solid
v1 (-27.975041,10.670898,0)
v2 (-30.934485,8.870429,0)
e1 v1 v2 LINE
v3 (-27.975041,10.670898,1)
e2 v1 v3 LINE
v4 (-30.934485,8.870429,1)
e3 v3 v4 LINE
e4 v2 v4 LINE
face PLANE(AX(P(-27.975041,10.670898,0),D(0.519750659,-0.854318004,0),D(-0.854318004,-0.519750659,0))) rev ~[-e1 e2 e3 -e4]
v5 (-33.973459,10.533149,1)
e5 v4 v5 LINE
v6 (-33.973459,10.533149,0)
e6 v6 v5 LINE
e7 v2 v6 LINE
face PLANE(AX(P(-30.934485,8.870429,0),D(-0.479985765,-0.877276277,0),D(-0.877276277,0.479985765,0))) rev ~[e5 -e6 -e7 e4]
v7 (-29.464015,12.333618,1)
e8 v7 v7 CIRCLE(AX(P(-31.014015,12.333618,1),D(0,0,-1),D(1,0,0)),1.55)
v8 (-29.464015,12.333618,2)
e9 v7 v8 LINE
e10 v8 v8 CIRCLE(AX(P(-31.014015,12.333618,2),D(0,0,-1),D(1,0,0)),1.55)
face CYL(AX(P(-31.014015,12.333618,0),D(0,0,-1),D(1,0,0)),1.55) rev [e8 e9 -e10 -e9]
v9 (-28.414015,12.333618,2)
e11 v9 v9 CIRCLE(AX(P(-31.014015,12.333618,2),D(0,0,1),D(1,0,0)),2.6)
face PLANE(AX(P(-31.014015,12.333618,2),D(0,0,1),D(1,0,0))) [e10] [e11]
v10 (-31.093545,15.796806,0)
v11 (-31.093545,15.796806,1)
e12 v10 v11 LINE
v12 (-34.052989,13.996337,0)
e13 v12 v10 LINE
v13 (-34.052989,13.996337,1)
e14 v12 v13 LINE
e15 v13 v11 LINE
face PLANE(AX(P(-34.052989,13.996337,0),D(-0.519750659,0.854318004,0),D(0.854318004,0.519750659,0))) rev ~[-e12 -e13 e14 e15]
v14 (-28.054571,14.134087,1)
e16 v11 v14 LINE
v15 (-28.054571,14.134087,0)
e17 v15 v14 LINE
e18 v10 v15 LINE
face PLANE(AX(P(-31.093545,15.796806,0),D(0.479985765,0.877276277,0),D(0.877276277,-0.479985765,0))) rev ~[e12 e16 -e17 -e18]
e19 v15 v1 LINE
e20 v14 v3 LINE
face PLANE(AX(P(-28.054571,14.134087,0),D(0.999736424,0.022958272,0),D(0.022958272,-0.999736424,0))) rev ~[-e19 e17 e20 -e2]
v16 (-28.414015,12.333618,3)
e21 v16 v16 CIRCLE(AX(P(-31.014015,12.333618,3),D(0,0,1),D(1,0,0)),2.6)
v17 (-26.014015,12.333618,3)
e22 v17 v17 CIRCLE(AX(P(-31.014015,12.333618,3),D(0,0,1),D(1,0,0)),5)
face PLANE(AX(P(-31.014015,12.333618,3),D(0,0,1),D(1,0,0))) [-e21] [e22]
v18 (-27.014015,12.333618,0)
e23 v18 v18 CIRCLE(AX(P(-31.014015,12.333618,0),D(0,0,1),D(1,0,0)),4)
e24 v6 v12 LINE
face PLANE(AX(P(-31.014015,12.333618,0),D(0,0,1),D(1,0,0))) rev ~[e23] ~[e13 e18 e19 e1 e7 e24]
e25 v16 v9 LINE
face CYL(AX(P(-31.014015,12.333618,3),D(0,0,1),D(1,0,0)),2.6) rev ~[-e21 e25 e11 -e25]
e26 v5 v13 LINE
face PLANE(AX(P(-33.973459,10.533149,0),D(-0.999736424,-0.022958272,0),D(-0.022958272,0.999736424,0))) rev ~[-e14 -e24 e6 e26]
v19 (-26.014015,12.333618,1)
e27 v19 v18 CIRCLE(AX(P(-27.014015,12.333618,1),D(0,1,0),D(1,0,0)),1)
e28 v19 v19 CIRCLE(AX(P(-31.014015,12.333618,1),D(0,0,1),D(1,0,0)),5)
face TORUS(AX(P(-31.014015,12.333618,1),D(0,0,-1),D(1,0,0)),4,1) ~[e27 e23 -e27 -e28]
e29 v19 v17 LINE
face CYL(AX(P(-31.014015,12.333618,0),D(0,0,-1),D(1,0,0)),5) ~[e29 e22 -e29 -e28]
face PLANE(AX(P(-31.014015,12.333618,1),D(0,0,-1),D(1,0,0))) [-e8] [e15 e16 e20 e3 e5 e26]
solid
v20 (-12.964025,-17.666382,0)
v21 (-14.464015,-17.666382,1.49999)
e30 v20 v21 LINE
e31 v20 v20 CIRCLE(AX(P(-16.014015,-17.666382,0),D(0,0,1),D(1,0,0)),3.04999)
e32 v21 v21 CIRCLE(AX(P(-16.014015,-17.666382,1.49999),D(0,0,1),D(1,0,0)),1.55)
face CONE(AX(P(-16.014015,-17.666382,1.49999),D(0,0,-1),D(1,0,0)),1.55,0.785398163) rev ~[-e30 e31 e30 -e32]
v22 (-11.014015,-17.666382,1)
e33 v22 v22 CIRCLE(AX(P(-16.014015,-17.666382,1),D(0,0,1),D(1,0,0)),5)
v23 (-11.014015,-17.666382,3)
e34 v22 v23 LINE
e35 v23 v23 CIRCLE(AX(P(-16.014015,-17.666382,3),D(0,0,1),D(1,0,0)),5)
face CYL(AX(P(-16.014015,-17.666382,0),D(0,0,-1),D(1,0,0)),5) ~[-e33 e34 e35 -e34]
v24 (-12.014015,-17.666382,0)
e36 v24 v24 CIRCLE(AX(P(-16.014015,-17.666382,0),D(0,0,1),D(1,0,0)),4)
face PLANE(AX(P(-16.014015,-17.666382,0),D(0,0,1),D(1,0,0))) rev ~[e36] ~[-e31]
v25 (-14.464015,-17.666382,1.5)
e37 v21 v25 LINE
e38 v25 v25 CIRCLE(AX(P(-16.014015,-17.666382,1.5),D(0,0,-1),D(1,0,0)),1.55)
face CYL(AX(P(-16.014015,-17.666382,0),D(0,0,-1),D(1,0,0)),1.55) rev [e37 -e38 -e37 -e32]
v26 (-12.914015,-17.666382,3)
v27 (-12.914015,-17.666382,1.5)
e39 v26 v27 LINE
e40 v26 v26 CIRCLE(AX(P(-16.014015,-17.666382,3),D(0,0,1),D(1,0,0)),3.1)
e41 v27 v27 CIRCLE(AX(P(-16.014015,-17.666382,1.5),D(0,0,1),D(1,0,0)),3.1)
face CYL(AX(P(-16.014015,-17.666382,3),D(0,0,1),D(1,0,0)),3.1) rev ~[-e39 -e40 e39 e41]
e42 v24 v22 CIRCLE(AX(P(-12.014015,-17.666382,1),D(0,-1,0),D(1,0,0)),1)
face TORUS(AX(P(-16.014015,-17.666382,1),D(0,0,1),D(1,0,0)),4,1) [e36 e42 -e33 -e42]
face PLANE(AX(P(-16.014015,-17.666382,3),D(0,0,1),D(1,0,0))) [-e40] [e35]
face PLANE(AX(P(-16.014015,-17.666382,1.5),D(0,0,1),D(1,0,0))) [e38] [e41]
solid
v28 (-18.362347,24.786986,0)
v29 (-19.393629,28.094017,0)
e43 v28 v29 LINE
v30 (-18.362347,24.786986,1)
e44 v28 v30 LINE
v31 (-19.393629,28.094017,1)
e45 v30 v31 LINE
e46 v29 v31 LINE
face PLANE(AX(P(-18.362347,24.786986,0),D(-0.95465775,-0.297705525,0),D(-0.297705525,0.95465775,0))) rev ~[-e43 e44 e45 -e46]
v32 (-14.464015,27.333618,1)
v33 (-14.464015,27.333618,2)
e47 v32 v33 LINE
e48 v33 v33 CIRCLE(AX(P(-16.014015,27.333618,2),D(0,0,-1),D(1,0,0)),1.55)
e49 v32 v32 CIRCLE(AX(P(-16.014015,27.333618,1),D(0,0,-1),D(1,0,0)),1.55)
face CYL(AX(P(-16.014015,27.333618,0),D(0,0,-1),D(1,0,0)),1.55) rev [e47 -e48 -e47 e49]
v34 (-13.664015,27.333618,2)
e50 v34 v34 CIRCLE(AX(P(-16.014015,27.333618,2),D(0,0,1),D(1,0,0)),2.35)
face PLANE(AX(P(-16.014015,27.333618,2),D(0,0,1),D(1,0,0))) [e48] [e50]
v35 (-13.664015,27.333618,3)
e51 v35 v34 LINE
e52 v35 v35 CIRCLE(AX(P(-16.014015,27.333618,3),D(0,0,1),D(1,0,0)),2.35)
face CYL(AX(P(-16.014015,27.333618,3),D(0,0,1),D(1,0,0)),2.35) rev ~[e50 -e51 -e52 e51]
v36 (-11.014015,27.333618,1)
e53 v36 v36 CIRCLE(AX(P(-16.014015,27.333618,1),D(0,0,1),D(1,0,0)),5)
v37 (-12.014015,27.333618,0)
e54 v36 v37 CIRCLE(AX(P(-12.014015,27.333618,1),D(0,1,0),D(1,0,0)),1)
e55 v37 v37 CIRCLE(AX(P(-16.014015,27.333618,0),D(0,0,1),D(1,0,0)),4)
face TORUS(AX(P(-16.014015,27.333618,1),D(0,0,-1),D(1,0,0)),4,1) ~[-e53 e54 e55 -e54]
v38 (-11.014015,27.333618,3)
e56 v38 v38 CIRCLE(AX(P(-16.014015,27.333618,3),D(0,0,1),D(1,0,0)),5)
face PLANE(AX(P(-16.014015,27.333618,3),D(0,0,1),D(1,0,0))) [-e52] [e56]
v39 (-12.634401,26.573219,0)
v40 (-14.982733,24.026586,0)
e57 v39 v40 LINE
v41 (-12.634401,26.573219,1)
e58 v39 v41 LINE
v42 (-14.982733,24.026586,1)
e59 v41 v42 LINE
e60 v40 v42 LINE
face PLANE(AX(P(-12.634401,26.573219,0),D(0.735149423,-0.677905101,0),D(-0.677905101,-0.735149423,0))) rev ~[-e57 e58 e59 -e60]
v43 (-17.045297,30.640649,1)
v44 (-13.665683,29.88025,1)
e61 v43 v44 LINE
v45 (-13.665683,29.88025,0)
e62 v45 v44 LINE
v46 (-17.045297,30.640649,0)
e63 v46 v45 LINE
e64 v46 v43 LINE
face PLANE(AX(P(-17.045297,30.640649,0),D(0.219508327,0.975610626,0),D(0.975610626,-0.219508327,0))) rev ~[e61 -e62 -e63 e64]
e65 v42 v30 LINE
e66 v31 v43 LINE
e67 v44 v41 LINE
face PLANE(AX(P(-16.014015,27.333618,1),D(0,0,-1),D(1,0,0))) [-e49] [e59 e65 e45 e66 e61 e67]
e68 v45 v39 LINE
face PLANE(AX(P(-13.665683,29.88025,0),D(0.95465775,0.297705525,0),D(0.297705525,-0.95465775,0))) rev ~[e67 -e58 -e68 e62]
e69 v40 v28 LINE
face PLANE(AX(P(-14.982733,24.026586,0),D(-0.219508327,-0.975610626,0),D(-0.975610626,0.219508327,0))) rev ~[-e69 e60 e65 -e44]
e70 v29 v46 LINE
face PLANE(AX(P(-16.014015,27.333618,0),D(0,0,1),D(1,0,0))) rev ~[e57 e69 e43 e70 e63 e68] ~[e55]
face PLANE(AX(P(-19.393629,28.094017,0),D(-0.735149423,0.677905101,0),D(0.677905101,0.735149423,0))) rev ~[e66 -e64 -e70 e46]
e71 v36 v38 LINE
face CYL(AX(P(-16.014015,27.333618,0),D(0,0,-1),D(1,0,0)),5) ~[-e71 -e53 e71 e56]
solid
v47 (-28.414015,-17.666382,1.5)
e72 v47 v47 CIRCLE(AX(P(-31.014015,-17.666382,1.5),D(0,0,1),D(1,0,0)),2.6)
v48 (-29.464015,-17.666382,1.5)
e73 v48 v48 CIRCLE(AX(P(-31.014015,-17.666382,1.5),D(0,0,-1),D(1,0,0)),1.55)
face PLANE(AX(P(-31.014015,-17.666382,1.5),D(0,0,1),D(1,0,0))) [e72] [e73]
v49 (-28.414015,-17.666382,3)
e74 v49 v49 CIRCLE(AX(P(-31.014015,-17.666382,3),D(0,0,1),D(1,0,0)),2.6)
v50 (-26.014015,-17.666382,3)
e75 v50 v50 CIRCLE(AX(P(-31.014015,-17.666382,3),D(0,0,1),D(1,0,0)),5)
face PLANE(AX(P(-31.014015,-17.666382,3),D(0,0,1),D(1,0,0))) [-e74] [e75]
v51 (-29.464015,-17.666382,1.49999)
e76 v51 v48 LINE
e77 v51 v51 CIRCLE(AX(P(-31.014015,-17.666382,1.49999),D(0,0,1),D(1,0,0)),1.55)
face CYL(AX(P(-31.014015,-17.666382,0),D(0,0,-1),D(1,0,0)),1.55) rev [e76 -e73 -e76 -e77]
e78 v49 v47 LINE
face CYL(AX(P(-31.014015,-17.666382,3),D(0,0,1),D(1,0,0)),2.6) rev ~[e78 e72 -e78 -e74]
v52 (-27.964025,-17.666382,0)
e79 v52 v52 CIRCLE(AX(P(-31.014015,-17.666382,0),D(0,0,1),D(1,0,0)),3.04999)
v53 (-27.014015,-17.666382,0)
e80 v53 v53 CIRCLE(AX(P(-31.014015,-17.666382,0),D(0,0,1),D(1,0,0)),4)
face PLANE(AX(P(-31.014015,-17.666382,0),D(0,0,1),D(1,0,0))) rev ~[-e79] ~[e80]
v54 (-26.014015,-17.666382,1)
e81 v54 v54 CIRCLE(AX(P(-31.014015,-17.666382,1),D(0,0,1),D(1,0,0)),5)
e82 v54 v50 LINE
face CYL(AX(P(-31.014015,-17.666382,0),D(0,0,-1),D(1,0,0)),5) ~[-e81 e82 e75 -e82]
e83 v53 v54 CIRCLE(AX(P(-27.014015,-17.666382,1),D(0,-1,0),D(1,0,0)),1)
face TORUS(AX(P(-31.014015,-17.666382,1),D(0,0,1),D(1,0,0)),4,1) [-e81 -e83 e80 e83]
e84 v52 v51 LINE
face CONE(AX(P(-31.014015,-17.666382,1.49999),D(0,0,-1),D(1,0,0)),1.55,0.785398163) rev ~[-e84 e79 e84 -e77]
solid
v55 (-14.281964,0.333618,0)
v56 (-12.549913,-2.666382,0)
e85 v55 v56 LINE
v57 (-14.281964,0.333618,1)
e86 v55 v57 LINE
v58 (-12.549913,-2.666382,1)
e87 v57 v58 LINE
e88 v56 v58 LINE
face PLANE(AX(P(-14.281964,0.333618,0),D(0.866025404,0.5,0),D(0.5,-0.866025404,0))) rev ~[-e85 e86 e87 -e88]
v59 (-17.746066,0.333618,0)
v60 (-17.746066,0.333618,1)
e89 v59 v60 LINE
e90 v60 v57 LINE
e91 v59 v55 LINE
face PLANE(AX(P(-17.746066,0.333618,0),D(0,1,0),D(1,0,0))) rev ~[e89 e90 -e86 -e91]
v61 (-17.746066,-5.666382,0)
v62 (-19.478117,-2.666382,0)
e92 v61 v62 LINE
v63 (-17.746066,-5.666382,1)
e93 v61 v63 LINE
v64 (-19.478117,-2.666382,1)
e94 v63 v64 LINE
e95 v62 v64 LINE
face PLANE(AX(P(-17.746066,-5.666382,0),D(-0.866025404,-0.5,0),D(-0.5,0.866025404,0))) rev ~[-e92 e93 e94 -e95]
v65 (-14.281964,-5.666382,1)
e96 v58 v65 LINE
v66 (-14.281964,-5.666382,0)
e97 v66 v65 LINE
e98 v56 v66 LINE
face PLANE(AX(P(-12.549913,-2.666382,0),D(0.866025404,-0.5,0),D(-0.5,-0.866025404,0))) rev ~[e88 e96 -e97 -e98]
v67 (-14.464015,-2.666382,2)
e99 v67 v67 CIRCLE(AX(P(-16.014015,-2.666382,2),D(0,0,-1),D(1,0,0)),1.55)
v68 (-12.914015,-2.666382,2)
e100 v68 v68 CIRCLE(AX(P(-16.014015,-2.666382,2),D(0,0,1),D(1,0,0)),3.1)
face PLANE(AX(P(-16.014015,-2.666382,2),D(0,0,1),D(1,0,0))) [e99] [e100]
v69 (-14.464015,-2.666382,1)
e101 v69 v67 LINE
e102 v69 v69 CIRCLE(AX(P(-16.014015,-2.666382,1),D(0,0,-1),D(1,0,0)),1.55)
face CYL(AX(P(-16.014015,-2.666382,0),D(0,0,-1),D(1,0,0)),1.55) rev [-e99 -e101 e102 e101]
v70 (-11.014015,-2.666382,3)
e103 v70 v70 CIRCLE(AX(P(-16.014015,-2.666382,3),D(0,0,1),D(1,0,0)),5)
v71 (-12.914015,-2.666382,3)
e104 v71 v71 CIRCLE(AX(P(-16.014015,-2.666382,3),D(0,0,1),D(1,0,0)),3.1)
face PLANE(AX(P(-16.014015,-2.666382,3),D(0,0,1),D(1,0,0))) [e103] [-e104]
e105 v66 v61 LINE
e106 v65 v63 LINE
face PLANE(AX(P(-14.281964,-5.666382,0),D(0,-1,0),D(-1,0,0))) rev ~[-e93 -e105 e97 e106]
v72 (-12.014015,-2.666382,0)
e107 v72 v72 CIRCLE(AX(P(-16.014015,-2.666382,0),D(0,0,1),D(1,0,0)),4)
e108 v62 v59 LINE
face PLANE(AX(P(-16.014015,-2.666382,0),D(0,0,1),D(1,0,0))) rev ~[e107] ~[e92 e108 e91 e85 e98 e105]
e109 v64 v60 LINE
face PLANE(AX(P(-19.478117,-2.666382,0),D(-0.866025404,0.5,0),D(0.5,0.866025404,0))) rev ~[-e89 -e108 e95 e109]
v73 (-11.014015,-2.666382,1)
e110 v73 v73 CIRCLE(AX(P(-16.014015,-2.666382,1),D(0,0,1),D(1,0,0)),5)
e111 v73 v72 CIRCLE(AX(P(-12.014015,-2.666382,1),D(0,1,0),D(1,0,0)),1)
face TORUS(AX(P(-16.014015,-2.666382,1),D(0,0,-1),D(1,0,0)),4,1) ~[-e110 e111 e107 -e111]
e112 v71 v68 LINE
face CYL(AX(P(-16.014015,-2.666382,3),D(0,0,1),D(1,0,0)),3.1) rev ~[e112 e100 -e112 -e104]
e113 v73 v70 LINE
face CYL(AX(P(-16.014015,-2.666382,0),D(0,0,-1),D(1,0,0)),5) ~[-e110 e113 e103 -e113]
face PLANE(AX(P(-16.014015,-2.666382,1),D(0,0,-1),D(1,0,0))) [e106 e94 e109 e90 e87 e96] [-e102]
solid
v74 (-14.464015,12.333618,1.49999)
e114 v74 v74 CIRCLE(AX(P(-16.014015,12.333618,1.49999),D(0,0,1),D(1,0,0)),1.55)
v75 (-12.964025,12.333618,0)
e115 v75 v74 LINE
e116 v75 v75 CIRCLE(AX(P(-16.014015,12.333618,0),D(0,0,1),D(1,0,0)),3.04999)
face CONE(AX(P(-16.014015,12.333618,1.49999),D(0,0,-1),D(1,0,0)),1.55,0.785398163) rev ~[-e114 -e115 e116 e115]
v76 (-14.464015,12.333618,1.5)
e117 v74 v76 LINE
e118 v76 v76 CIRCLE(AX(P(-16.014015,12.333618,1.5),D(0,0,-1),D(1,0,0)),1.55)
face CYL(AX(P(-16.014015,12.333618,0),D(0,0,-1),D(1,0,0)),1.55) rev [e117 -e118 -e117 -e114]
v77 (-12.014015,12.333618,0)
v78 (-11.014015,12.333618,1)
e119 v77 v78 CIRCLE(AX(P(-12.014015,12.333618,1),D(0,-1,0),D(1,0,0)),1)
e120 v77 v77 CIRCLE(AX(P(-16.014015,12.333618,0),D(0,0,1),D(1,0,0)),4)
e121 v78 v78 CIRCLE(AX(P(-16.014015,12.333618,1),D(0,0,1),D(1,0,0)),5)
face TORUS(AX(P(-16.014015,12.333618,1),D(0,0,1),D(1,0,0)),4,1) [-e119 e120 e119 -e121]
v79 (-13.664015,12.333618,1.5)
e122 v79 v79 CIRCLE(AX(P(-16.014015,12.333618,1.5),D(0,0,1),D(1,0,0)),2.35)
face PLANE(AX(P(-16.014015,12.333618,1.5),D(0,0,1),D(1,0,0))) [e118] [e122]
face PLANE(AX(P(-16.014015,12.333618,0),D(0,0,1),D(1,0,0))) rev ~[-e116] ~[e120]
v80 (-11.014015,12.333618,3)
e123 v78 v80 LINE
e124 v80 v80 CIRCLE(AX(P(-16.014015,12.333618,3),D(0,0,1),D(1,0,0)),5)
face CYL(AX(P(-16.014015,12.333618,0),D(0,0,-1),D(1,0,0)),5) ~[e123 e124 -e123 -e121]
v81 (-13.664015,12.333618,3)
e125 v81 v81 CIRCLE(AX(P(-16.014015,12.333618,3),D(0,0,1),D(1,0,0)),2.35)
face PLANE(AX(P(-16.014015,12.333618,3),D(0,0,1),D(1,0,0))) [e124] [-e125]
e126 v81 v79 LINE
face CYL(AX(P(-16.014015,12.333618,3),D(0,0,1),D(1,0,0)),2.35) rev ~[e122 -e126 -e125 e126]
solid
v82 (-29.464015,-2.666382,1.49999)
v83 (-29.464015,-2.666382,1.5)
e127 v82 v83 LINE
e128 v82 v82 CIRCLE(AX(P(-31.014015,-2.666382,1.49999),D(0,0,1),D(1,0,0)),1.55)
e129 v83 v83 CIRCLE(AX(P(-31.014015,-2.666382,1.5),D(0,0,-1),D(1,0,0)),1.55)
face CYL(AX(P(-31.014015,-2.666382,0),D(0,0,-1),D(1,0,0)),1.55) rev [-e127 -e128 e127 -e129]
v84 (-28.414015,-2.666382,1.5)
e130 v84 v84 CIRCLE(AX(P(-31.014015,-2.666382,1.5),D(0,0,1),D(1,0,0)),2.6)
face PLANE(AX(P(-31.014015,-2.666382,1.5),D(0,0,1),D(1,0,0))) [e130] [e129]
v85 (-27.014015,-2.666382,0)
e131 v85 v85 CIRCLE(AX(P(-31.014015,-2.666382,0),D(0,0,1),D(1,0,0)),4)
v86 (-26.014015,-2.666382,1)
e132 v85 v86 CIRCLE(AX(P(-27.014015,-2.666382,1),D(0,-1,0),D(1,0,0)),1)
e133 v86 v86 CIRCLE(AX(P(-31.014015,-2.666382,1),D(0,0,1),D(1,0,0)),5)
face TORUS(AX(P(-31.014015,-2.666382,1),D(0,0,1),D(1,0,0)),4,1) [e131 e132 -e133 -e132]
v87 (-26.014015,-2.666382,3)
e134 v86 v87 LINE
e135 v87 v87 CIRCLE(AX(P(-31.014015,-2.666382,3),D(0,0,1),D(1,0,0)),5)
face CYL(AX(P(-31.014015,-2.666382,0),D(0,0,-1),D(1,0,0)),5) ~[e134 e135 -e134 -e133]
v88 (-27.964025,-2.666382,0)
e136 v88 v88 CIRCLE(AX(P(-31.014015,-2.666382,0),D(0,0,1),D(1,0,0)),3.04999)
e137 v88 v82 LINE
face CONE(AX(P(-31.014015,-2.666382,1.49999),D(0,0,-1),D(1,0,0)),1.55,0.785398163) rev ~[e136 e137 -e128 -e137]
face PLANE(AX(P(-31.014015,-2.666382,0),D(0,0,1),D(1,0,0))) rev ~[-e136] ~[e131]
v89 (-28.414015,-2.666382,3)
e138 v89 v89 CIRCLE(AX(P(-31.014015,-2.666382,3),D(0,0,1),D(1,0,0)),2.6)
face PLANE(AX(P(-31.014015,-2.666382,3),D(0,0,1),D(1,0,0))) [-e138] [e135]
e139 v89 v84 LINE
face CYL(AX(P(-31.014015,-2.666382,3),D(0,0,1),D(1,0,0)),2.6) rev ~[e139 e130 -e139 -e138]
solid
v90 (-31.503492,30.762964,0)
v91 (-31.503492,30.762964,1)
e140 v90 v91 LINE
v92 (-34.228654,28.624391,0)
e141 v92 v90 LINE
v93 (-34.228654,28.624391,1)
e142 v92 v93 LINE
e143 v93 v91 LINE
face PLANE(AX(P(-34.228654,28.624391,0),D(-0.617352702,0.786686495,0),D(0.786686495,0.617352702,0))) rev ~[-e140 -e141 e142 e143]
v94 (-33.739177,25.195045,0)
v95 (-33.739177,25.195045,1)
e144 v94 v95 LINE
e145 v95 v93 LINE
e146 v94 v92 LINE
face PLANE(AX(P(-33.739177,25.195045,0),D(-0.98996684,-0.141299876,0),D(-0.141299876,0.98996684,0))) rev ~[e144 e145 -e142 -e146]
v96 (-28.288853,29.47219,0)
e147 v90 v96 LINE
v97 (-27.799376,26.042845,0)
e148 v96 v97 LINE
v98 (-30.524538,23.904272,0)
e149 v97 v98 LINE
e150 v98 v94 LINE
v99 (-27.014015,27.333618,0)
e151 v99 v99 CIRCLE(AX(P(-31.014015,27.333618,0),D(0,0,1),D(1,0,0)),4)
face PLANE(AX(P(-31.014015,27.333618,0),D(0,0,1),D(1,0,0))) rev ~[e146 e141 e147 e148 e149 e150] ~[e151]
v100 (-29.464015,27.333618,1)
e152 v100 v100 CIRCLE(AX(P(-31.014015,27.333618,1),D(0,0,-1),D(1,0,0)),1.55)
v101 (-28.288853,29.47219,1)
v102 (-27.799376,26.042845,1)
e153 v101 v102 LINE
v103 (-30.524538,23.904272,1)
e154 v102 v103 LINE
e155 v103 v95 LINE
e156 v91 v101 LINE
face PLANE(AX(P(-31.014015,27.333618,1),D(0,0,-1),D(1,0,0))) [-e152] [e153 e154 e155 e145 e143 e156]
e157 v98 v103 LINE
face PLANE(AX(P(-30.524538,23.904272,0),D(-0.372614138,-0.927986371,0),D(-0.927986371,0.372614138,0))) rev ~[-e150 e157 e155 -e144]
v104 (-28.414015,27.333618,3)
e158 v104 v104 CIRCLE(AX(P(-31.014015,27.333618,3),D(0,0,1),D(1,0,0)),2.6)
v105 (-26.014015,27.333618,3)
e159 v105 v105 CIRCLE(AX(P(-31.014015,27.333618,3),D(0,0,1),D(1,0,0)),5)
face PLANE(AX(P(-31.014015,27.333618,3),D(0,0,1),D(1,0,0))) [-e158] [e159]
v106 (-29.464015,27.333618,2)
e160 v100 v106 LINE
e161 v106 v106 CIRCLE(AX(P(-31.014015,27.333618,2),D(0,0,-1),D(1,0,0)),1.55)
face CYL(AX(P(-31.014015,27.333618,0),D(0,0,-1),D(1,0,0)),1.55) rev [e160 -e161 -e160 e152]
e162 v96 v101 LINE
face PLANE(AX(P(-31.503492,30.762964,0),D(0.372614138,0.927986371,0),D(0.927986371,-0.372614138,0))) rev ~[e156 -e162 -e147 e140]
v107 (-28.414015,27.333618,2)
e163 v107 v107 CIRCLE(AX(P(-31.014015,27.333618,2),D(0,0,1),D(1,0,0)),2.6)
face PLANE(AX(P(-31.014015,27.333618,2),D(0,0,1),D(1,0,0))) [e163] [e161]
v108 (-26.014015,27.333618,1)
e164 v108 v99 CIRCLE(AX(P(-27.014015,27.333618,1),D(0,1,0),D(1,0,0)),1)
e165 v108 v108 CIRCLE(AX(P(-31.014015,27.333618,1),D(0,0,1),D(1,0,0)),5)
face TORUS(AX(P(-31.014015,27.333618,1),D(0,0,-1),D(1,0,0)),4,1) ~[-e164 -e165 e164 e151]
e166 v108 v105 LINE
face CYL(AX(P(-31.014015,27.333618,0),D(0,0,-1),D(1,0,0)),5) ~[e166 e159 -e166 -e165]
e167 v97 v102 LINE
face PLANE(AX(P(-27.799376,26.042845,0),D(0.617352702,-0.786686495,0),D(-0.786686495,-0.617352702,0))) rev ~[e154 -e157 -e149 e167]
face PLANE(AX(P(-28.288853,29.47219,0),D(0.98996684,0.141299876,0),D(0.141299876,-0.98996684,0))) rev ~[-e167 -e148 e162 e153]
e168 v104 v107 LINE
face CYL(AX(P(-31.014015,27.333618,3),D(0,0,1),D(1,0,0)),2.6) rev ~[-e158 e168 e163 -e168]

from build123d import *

# Parameters (mm, degrees)
F0_R       = 5
F0_R_2     = 1.55
F1_DEPTH   = 3
F2_R       = 2.6
F3_DEPTH   = 1.5
F4_R       = 2.6
F5_DEPTH   = 1.5
F6_R       = 2.6
F7_DEPTH   = 1
F8_R       = 2.6
F9_DEPTH   = 1
F10_R      = 3.1
F11_DEPTH  = 1.5
F12_R      = 3.1
F13_DEPTH  = 1
F14_R      = 2.35
F15_DEPTH  = 1.5
F16_R      = 2.35
F17_DEPTH  = 1
F19_DEPTH  = 1
F21_DEPTH  = 1
F23_DEPTH  = 1
F25_DEPTH  = 1
F26_SIZE   = 1.49999
F26_2_SIZE = 1.49999
F26_3_SIZE = 1.49999
F26_4_SIZE = 1.49999
F27_R      = 1
F27_2_R    = 1
F27_3_R    = 1
F27_4_R    = 1
F27_5_R    = 1
F27_6_R    = 1
F27_7_R    = 1
F27_8_R    = 1


# Not quite as in the source:
# - a fillet or chamfer is up to 0.001 mm smaller than in the source, because OpenCascade refuses the exact size


with BuildPart() as f1:
    # F0 (on Top) → F1 (new body)
    with BuildSketch(Plane.XY):
        with Locations((-31.0140149226, -17.6663821694)):
            Circle(F0_R)
        with Locations((-31.0140149226, -17.6663821694)):
            Circle(F0_R_2, mode=Mode.SUBTRACT)
    extrude(amount=F1_DEPTH)

    # F2 (on face) → F3 (cut)
    with BuildSketch(Plane.XY.offset(3)):
        with Locations((-31.0140149226, -17.6663821694)):
            Circle(F2_R)
    extrude(amount=-F3_DEPTH, mode=Mode.SUBTRACT)

    # F26#4 (size 1.5 in the source; OpenCascade refuses exactly that, so slightly less here)
    f26_4_edges = [f1.edges().sort_by_distance(p)[0] for p in [
        (-32.564015, -17.666382, 0),
    ]]
    chamfer(f26_4_edges, length=F26_4_SIZE)

    # F27
    f27_edges = [f1.edges().sort_by_distance(p)[0] for p in [
        (-36.014015, -17.666382, 0),
    ]]
    fillet(f27_edges, radius=F27_R)


with BuildPart() as f1b:
    # F0 (on Top) → F1, piece 2 (new body)
    with BuildSketch(Plane.XY):
        with Locations((-31.0140149226, -2.6663821694)):
            Circle(F0_R)
        with Locations((-31.0140149226, -2.6663821694)):
            Circle(F0_R_2, mode=Mode.SUBTRACT)
    extrude(amount=F1_DEPTH)

    # F4 (on face) → F5 (cut)
    with BuildSketch(Plane.XY.offset(3)):
        with Locations((-31.0140149226, -2.6663821694)):
            Circle(F4_R)
    extrude(amount=-F5_DEPTH, mode=Mode.SUBTRACT)

    # F26#3 (size 1.5 in the source; OpenCascade refuses exactly that, so slightly less here)
    f26_3_edges = [f1b.edges().sort_by_distance(p)[0] for p in [
        (-32.564015, -2.666382, 0),
    ]]
    chamfer(f26_3_edges, length=F26_3_SIZE)

    # F27#2
    f27_2_edges = [f1b.edges().sort_by_distance(p)[0] for p in [
        (-36.014015, -2.666382, 0),
    ]]
    fillet(f27_2_edges, radius=F27_2_R)


with BuildPart() as f1c:
    # F0 (on Top) → F1, piece 3 (new body)
    with BuildSketch(Plane.XY):
        with Locations((-31.0140149226, 12.3336178306)):
            Circle(F0_R)
        with Locations((-31.0140149226, 12.3336178306)):
            Circle(F0_R_2, mode=Mode.SUBTRACT)
    extrude(amount=F1_DEPTH)

    # F6 (on face) → F7 (cut)
    with BuildSketch(Plane.XY.offset(3)):
        with Locations((-31.0140149226, 12.3336178306)):
            Circle(F6_R)
    extrude(amount=-F7_DEPTH, mode=Mode.SUBTRACT)

    # F20 (on face) → F21 (cut)
    with BuildSketch(Plane(origin=(0, 0, 0), x_dir=(1, 0, 0), z_dir=(0, 0, -1))):
        Polygon((-31.0935447109, -15.7968063922), (-28.0545705444, -14.1340869284), (-27.9750407561, -10.6708983669), (-30.9344851344, -8.8704292691), (-33.9734593009, -10.5331487329), (-34.0529890891, -13.9963372944), align=None)
    extrude(amount=-F21_DEPTH, mode=Mode.SUBTRACT)

    # F27#6
    f27_6_edges = [f1c.edges().sort_by_distance(p)[0] for p in [
        (-36.014015, 12.333618, 0),
    ]]
    fillet(f27_6_edges, radius=F27_6_R)


with BuildPart() as f1d:
    # F0 (on Top) → F1, piece 4 (new body)
    with BuildSketch(Plane.XY):
        with Locations((-31.0140149226, 27.3336178306)):
            Circle(F0_R)
        with Locations((-31.0140149226, 27.3336178306)):
            Circle(F0_R_2, mode=Mode.SUBTRACT)
    extrude(amount=F1_DEPTH)

    # F8 (on face) → F9 (cut)
    with BuildSketch(Plane.XY.offset(3)):
        with Locations((-31.0140149226, 27.3336178306)):
            Circle(F8_R)
    extrude(amount=-F9_DEPTH, mode=Mode.SUBTRACT)

    # F18 (on face) → F19 (cut)
    with BuildSketch(Plane(origin=(0, 0, 0), x_dir=(1, 0, 0), z_dir=(0, 0, -1))):
        Polygon((-31.5034920511, -30.7629635613), (-28.2888529657, -29.4721903239), (-27.7993758372, -26.0428445932), (-30.5245377941, -23.9042720999), (-33.7391768795, -25.1950453374), (-34.228654008, -28.6243910681), align=None)
    extrude(amount=-F19_DEPTH, mode=Mode.SUBTRACT)

    # F27#7
    f27_7_edges = [f1d.edges().sort_by_distance(p)[0] for p in [
        (-36.014015, 27.333618, 0),
    ]]
    fillet(f27_7_edges, radius=F27_7_R)


with BuildPart() as f1e:
    # F0 (on Top) → F1, piece 5 (new body)
    with BuildSketch(Plane.XY):
        with Locations((-16.0140149226, -17.6663821694)):
            Circle(F0_R)
        with Locations((-16.0140149226, -17.6663821694)):
            Circle(F0_R_2, mode=Mode.SUBTRACT)
    extrude(amount=F1_DEPTH)

    # F10 (on face) → F11 (cut)
    with BuildSketch(Plane.XY.offset(3)):
        with Locations((-16.0140149226, -17.6663821694)):
            Circle(F10_R)
    extrude(amount=-F11_DEPTH, mode=Mode.SUBTRACT)

    # F26 (size 1.5 in the source; OpenCascade refuses exactly that, so slightly less here)
    f26_edges = [f1e.edges().sort_by_distance(p)[0] for p in [
        (-17.564015, -17.666382, 0),
    ]]
    chamfer(f26_edges, length=F26_SIZE)

    # F27#4
    f27_4_edges = [f1e.edges().sort_by_distance(p)[0] for p in [
        (-21.014015, -17.666382, 0),
    ]]
    fillet(f27_4_edges, radius=F27_4_R)


with BuildPart() as f1f:
    # F0 (on Top) → F1, piece 6 (new body)
    with BuildSketch(Plane.XY):
        with Locations((-16.0140149226, -2.6663821694)):
            Circle(F0_R)
        with Locations((-16.0140149226, -2.6663821694)):
            Circle(F0_R_2, mode=Mode.SUBTRACT)
    extrude(amount=F1_DEPTH)

    # F12 (on face) → F13 (cut)
    with BuildSketch(Plane.XY.offset(3)):
        with Locations((-16.0140149226, -2.6663821694)):
            Circle(F12_R)
    extrude(amount=-F13_DEPTH, mode=Mode.SUBTRACT)

    # F24 (on face) → F25 (cut)
    with BuildSketch(Plane(origin=(0, 0, 0), x_dir=(1, 0, 0), z_dir=(0, 0, -1))):
        Polygon((-17.7460657302, -0.3336178306), (-14.281964115, -0.3336178306), (-12.5499133075, 2.6663821694), (-14.281964115, 5.6663821694), (-17.7460657302, 5.6663821694), (-19.4781165378, 2.6663821694), align=None)
    extrude(amount=-F25_DEPTH, mode=Mode.SUBTRACT)

    # F27#3
    f27_3_edges = [f1f.edges().sort_by_distance(p)[0] for p in [
        (-21.014015, -2.666382, 0),
    ]]
    fillet(f27_3_edges, radius=F27_3_R)


with BuildPart() as f1g:
    # F0 (on Top) → F1, piece 7 (new body)
    with BuildSketch(Plane.XY):
        with Locations((-16.0140149226, 12.3336178306)):
            Circle(F0_R)
        with Locations((-16.0140149226, 12.3336178306)):
            Circle(F0_R_2, mode=Mode.SUBTRACT)
    extrude(amount=F1_DEPTH)

    # F14 (on face) → F15 (cut)
    with BuildSketch(Plane.XY.offset(3)):
        with Locations((-16.0140149226, 12.3336178306)):
            Circle(F14_R)
    extrude(amount=-F15_DEPTH, mode=Mode.SUBTRACT)

    # F26#2 (size 1.5 in the source; OpenCascade refuses exactly that, so slightly less here)
    f26_2_edges = [f1g.edges().sort_by_distance(p)[0] for p in [
        (-17.564015, 12.333618, 0),
    ]]
    chamfer(f26_2_edges, length=F26_2_SIZE)

    # F27#5
    f27_5_edges = [f1g.edges().sort_by_distance(p)[0] for p in [
        (-21.014015, 12.333618, 0),
    ]]
    fillet(f27_5_edges, radius=F27_5_R)


with BuildPart() as f1h:
    # F0 (on Top) → F1, piece 8 (new body)
    with BuildSketch(Plane.XY):
        with Locations((-16.0140149226, 27.3336178306)):
            Circle(F0_R)
        with Locations((-16.0140149226, 27.3336178306)):
            Circle(F0_R_2, mode=Mode.SUBTRACT)
    extrude(amount=F1_DEPTH)

    # F16 (on face) → F17 (cut)
    with BuildSketch(Plane.XY.offset(3)):
        with Locations((-16.0140149226, 27.3336178306)):
            Circle(F16_R)
    extrude(amount=-F17_DEPTH, mode=Mode.SUBTRACT)

    # F22 (on face) → F23 (cut)
    with BuildSketch(Plane(origin=(0, 0, 0), x_dir=(1, 0, 0), z_dir=(0, 0, -1))):
        Polygon((-17.0452971133, -30.6406492855), (-13.665682767, -29.8802501337), (-12.6344005763, -26.5732186789), (-14.9827327319, -24.0265863758), (-18.3623470782, -24.7869855276), (-19.393629269, -28.0940169824), align=None)
    extrude(amount=-F23_DEPTH, mode=Mode.SUBTRACT)

    # F27#8
    f27_8_edges = [f1h.edges().sort_by_distance(p)[0] for p in [
        (-21.014015, 27.333618, 0),
    ]]
    fillet(f27_8_edges, radius=F27_8_R)


solid = Compound([f1.part, f1b.part, f1c.part, f1d.part, f1e.part, f1f.part, f1g.part, f1h.part])
